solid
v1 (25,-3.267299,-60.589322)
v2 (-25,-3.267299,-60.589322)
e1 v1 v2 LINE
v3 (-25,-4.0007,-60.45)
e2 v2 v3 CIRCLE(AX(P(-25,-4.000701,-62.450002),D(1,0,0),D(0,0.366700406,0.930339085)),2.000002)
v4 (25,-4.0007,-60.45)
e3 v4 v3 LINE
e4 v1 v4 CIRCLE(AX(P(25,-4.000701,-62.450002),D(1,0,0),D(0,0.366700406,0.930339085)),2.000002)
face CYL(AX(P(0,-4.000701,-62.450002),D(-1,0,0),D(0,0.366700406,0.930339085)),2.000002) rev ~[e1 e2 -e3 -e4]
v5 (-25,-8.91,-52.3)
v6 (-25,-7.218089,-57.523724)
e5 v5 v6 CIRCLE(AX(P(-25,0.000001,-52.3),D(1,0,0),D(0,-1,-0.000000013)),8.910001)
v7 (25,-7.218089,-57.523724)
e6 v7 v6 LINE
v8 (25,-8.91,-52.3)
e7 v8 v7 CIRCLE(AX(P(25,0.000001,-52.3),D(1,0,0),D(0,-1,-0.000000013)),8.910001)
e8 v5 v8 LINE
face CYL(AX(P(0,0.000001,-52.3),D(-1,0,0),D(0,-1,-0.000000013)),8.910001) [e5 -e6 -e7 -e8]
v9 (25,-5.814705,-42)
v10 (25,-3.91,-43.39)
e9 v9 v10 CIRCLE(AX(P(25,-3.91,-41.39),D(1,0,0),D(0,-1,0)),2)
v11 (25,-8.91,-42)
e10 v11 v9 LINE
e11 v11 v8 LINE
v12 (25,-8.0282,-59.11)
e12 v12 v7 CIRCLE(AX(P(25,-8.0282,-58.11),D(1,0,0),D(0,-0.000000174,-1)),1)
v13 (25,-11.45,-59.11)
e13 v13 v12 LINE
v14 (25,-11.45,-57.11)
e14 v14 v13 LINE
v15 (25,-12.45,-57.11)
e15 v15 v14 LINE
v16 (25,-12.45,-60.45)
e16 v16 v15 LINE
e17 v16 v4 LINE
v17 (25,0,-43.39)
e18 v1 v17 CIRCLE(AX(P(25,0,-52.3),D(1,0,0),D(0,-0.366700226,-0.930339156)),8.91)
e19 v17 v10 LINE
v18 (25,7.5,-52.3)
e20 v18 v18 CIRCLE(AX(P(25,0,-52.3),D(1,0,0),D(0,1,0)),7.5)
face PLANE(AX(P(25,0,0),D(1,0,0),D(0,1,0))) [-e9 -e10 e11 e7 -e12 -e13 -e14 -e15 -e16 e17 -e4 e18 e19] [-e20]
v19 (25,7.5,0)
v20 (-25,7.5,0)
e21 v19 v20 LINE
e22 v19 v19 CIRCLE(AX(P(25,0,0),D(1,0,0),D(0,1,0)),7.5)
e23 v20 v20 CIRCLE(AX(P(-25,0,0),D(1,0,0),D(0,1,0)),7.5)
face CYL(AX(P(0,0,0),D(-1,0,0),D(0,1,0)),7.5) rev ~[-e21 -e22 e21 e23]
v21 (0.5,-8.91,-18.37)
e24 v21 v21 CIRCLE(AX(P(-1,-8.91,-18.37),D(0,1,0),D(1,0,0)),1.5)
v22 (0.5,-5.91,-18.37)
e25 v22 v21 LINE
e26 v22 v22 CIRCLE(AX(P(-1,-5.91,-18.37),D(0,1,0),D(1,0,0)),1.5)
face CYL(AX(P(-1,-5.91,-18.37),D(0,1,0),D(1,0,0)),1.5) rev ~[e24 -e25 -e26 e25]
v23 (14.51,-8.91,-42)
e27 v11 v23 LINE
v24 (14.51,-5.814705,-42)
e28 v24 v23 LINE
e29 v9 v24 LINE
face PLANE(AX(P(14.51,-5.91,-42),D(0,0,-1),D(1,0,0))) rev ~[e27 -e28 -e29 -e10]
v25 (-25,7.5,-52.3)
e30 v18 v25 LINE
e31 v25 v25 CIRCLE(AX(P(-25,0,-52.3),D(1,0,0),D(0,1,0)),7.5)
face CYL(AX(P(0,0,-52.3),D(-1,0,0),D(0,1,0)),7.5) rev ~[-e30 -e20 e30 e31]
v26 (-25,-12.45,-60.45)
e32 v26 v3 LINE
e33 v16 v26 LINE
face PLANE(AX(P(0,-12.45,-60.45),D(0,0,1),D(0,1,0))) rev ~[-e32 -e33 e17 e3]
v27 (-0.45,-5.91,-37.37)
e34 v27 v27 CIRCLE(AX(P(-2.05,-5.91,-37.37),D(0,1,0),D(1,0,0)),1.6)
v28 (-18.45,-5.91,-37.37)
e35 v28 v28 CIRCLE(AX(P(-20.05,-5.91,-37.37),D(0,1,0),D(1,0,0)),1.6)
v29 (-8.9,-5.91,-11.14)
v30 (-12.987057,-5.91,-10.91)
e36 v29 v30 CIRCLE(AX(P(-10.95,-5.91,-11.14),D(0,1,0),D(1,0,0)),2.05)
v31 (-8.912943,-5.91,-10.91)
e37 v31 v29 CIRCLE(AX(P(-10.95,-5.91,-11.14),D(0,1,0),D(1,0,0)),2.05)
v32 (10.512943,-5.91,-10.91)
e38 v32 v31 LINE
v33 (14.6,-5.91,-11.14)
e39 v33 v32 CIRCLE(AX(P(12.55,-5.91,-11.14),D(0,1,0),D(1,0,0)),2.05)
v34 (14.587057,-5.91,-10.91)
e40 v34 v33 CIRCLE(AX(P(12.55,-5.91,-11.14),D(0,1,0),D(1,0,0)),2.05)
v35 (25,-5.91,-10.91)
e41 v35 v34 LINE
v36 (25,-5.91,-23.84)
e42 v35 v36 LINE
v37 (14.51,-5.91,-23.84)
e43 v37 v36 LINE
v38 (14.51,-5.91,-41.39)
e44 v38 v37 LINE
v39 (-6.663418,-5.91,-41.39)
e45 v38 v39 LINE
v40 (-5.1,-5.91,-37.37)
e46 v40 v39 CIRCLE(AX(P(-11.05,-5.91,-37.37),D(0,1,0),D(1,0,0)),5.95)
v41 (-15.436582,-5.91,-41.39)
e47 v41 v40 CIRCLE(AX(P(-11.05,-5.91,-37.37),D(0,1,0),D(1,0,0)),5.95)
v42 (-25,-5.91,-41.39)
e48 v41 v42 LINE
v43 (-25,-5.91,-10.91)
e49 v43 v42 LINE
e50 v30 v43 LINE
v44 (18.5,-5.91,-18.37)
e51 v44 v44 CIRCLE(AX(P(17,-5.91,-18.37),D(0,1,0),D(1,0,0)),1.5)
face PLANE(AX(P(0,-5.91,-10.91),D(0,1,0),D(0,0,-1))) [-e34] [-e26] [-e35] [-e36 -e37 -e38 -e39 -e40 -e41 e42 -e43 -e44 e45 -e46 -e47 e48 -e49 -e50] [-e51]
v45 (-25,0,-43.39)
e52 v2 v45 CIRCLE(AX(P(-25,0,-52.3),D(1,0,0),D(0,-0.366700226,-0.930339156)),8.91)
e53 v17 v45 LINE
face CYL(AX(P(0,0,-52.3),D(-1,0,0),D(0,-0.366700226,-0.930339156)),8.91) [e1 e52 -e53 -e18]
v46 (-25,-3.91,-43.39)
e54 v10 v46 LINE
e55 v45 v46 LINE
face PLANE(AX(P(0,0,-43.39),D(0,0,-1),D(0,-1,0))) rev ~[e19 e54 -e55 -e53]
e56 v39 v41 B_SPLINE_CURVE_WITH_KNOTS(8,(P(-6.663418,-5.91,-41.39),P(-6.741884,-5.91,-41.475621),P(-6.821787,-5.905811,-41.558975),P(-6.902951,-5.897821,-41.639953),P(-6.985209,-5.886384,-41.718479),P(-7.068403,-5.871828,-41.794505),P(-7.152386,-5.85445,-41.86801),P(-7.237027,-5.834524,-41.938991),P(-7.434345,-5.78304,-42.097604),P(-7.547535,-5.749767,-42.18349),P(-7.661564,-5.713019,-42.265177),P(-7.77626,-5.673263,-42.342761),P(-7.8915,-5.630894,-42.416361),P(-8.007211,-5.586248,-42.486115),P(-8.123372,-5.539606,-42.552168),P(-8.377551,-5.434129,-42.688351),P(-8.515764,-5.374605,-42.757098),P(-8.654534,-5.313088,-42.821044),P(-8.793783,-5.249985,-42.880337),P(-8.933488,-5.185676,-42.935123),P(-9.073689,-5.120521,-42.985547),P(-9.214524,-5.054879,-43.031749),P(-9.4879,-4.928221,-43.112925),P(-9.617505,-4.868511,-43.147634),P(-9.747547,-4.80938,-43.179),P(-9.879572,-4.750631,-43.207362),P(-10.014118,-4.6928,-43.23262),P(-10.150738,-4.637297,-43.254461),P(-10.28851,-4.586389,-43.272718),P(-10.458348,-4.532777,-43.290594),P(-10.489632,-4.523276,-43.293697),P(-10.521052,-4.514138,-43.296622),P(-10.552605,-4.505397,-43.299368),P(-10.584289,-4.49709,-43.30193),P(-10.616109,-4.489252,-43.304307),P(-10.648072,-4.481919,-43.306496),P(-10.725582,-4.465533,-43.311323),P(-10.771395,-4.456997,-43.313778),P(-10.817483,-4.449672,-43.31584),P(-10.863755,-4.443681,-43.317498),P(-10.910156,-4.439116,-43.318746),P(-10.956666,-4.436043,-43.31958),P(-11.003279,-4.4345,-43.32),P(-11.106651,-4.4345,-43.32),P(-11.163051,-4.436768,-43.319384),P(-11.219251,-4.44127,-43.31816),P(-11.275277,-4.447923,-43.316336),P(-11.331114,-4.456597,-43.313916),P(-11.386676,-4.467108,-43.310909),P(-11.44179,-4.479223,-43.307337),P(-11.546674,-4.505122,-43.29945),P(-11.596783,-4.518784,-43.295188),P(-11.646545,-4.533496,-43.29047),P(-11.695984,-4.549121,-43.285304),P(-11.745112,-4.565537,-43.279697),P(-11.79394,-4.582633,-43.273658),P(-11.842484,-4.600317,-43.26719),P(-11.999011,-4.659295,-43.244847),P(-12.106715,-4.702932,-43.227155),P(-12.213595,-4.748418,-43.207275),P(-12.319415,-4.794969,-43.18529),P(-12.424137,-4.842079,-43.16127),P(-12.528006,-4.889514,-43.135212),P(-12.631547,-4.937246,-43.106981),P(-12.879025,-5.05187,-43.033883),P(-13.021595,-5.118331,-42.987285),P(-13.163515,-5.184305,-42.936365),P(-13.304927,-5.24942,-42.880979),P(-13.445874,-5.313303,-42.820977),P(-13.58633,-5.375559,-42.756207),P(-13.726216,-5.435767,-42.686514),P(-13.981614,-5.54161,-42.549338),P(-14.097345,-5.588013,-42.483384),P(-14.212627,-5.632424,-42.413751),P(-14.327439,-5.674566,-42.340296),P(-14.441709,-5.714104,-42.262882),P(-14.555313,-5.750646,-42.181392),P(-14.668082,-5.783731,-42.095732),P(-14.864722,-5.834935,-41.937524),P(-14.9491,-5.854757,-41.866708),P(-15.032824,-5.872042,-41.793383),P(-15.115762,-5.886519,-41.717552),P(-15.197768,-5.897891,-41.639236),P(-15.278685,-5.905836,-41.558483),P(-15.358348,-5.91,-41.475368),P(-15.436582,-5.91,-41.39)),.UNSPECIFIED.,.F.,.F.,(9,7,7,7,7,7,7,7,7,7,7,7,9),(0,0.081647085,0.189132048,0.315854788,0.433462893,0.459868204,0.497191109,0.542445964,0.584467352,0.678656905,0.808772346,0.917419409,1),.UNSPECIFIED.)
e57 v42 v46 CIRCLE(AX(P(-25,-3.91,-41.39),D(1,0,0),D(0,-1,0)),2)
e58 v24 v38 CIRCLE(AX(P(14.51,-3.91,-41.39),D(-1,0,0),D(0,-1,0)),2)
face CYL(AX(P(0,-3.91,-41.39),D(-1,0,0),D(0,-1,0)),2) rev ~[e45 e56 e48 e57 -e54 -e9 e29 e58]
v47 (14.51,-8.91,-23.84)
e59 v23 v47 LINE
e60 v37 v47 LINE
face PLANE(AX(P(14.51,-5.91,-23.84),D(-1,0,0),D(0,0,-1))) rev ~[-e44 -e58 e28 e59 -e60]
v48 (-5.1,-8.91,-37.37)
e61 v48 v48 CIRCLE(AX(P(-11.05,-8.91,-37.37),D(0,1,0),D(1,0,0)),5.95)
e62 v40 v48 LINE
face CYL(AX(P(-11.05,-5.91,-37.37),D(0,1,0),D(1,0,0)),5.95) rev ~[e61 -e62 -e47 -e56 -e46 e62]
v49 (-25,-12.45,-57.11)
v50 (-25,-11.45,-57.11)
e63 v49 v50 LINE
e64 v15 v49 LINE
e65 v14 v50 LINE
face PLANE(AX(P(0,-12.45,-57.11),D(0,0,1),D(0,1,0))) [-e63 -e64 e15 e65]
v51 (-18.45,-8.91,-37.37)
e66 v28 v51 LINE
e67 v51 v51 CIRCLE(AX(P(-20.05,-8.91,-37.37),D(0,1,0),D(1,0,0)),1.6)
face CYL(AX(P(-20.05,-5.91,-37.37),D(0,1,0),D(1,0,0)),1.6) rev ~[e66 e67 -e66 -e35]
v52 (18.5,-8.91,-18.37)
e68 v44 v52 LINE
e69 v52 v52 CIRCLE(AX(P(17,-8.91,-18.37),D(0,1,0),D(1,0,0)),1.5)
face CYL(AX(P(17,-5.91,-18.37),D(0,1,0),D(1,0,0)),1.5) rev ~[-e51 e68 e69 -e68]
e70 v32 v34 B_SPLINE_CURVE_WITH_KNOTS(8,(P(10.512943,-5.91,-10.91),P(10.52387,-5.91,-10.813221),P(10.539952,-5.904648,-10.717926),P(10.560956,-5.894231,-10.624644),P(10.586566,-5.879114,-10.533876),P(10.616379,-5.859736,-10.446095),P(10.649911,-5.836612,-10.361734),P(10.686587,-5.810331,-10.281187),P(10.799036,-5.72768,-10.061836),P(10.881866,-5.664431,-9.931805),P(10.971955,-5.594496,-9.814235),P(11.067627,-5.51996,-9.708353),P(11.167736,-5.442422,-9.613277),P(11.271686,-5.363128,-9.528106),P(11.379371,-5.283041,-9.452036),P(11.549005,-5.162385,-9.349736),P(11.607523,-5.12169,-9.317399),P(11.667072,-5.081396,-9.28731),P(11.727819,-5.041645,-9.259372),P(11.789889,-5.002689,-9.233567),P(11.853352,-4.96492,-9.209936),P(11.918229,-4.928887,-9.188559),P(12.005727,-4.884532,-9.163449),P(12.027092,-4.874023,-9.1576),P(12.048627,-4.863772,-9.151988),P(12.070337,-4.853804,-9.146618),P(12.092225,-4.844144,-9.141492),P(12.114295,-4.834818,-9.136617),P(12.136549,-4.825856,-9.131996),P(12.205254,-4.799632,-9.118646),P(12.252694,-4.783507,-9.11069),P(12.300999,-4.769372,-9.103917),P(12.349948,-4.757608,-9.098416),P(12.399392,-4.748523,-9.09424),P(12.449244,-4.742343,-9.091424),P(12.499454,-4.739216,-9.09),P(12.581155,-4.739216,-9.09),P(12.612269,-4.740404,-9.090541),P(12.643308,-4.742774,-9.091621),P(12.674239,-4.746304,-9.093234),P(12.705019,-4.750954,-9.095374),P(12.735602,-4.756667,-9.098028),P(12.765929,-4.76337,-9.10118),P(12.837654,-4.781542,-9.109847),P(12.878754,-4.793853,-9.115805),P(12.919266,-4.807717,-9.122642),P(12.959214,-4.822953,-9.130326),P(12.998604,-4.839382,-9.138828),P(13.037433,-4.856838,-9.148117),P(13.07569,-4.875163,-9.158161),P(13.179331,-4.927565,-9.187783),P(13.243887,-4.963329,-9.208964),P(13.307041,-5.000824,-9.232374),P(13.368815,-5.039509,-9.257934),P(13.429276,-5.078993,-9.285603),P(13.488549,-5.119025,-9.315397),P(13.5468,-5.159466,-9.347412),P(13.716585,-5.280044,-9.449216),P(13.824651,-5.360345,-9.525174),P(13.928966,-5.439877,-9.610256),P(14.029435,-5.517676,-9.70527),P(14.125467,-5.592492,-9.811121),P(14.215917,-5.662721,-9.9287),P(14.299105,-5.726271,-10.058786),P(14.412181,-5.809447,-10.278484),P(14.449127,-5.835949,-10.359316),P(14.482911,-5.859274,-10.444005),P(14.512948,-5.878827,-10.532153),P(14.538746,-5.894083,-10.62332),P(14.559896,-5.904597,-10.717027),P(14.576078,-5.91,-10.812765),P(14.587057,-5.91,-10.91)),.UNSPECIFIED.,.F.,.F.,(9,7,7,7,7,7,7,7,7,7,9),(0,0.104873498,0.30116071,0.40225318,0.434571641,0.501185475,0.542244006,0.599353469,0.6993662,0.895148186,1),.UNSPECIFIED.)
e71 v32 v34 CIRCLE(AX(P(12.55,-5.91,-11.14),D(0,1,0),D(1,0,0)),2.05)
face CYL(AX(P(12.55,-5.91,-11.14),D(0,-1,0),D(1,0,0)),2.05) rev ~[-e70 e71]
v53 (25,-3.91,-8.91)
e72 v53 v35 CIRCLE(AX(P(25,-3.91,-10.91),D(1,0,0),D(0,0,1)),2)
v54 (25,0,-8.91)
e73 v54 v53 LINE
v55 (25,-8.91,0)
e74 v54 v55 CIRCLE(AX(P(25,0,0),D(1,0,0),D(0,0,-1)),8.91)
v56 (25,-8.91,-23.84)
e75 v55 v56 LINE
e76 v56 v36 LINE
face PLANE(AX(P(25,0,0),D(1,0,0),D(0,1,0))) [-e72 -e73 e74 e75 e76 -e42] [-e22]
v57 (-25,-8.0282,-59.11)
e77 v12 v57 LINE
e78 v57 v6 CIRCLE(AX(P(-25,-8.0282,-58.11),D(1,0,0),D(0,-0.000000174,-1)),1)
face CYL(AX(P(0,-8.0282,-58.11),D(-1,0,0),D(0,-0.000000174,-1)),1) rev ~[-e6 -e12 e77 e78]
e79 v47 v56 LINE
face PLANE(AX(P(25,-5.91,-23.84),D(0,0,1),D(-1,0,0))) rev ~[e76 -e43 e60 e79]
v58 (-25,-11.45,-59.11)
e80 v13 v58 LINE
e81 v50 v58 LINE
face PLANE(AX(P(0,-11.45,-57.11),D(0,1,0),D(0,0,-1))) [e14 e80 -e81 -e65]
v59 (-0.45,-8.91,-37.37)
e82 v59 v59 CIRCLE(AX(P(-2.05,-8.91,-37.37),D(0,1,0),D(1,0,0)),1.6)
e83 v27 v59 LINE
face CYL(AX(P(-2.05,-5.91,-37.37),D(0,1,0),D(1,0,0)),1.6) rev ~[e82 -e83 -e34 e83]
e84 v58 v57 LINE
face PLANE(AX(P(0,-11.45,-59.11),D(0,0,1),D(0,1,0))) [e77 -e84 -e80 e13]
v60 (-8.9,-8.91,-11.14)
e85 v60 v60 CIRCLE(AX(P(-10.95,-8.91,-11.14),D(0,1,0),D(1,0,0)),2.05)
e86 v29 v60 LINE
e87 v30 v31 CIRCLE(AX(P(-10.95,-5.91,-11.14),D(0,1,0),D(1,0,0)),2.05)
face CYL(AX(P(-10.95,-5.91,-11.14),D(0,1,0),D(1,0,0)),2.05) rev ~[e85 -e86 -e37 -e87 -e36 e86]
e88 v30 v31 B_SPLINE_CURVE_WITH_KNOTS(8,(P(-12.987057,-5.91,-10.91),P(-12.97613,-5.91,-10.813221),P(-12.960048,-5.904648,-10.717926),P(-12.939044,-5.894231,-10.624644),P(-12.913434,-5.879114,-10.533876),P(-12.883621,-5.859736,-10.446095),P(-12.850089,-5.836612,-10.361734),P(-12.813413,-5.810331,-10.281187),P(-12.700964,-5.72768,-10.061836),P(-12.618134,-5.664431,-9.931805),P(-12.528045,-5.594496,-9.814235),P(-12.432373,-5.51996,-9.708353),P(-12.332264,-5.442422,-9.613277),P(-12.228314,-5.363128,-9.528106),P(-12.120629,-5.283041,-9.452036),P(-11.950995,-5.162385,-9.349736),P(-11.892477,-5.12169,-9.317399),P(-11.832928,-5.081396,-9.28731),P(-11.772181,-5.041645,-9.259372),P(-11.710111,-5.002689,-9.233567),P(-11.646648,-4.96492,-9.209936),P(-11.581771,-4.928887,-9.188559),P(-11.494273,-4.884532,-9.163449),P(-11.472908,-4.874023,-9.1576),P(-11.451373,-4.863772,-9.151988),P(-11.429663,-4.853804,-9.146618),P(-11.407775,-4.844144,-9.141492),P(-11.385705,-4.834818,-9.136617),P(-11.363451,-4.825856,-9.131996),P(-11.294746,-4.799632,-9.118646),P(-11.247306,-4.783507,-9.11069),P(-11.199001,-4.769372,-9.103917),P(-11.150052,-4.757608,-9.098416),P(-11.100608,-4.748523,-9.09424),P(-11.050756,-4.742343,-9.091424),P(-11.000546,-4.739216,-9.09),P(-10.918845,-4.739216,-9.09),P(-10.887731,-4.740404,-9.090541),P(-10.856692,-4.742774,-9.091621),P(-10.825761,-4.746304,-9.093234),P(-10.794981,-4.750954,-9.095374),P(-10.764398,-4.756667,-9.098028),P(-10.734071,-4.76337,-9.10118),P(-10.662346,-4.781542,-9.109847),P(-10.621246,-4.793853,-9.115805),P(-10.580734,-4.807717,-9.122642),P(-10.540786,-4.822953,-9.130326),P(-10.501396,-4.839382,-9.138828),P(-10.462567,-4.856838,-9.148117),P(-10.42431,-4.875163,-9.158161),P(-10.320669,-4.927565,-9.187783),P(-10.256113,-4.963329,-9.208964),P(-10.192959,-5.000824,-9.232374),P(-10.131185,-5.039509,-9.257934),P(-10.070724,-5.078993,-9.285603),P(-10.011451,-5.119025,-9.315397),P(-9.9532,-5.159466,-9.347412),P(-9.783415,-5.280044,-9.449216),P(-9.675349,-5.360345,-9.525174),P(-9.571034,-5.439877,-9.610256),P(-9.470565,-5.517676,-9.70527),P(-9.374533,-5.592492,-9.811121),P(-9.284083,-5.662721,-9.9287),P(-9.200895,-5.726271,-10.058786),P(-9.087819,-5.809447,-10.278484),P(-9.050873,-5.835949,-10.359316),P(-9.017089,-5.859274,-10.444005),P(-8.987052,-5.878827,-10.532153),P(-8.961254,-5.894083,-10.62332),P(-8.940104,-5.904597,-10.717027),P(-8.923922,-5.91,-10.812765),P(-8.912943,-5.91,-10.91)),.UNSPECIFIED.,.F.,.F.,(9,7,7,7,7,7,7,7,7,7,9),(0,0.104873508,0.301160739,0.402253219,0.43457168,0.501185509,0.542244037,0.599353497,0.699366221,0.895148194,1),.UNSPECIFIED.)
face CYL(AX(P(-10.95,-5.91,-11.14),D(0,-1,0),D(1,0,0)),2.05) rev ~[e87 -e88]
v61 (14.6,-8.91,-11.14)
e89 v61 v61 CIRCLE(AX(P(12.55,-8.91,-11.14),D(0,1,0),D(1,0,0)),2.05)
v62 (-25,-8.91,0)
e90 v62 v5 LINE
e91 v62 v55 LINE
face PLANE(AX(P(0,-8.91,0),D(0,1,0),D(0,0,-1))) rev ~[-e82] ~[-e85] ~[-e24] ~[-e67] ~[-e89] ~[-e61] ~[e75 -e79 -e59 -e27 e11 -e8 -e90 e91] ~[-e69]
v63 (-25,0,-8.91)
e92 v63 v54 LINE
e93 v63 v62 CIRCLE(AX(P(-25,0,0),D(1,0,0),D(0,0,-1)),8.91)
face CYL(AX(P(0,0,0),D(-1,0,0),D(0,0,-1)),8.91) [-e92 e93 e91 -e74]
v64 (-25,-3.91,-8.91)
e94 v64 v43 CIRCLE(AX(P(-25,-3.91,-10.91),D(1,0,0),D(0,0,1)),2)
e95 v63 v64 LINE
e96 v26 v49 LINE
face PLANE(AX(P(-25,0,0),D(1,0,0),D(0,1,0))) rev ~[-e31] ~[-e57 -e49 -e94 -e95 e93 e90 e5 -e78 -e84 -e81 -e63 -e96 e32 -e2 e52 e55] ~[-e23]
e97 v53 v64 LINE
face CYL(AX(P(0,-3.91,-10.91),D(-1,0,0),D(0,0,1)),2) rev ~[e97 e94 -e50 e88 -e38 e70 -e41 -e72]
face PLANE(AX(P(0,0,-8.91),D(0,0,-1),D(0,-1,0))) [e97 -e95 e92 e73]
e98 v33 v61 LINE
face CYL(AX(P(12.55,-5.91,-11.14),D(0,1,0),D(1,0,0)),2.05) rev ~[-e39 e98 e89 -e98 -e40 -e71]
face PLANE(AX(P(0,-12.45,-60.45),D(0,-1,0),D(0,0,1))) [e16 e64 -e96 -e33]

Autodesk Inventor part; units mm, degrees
ref_plane "YZ Plane" through (0, 0, 0) normal (1, 0, 0) x (0, 1, 0)
ref_plane "XZ Plane" through (0, 0, 0) normal (0, 1, 0) x (-1, 0, 0)
ref_plane "XY Plane" through (0, 0, 0) normal (0, 0, 1) x (1, 0, 0)
sketch "Эскиз1" plane through (0, 0, 0) normal (1, 0, 0) x (0, 1, 0)
  line L0 (0, 0) -> (143.27187, 0) construction
  line L1 (0, 0) -> (0, -170.504512) construction
  arc A0 (0, -8.91) -> (-8.91, 0) centre (0, 0) ccw
  circle A1 centre (0, -52.3) radius 7.5
  circle A2 centre (0, 0) radius 7.5
  line L2 (-8.91, 0) -> (-8.91, -52.3)
  line L3 (-5.91, -10.91) -> (-5.91, -41.39)
  line L4 (0, -8.91) -> (-3.91, -8.91)
  line L5 (0, -43.39) -> (-3.91, -43.39)
  line L6 (-12.45, -60.45) -> (-12.45, -57.11)
  line L7 (-12.45, -57.11) -> (-11.45, -57.11)
  line L8 (-11.45, -57.11) -> (-11.45, -59.11)
  line L9 (-11.45, -59.11) -> (-8.0282, -59.11)
  arc A3 (-8.91, -52.3) -> (-7.218089, -57.523724) centre (0, -52.3) ccw
  arc A4 (-3.267299, -60.589322) -> (0, -43.39) centre (0, -52.3) ccw
  circle A5 centre (0, 0) radius 4 construction
  line L10 (0, 4) -> (-17.853128, 4) construction
  line L11 (-17.853128, 4) -> (-17.853128, -60.45) construction
  line L12 (-17.853128, -60.45) -> (-12.45, -60.45) construction
  line L13 (-12.45, -60.45) -> (-4.0007, -60.45)
  arc A6 (-8.0282, -59.11) -> (-7.218089, -57.523724) centre (-8.0282, -58.11) ccw
  arc A7 (-5.91, -41.39) -> (-3.91, -43.39) centre (-3.91, -41.39) ccw
  arc A8 (-3.91, -8.91) -> (-5.91, -10.91) centre (-3.91, -10.91) ccw
  arc A9 (-3.267299, -60.589322) -> (-4.0007, -60.45) centre (-4.0007, -62.45) ccw
  point P0 (-5.91, -43.39)
  point P1 (-5.91, -8.91)
  point P2 (0, -61.21)
  point P3 (-5.745607, -59.11)
  point P4 (-3.600778, -60.45)
  dimension "d34" = 8
  dimension "d0" = 17.82
  dimension "d2" = 15
  dimension "d3" = 15
  dimension "d4" = 52.3
  dimension "d5" = 3
  dimension "d9" = 1
  dimension "d11" = 8.91
  dimension "d12" = 8.91
  dimension "d13" = 3.54
  dimension "d35" = 64.45
  dimension "d36" = 3.34
  dimension "d37" = 1.34
  dimension "d38" = 1
  dimension "d39" = 2
  dimension "d40" = 2
  dimension "d41" = 2
  dimension "d42" = 63.11
  dimension "d43" = 70.12
extrude "Выдавливание1" add sketch "Эскиз1" along normal mid plane 50
sketch "Эскиз2" plane through (-25, -5.91, -8.91) normal (0, 1, 0) x (1, 0, 0)
  circle A0 centre (13.95, 28.46) radius 5.95
  line L0 (4.95, 28.46) -> (13.95, 28.46) construction
  line L1 (13.95, 28.46) -> (24.436318, 28.46) construction
  circle A1 centre (4.95, 28.46) radius 1.6
  circle A2 centre (22.95, 28.46) radius 1.6
  line L2 (13.95, 28.46) -> (13.95, 32.27883)
  circle A3 centre (4.95, 28.46) radius 1.455 construction
  circle A4 centre (22.95, 28.46) radius 1.455 construction
  line L3 (0, 5.642815) -> (0, 38.122815) construction
  line L4 (50, -8.91) -> (50, 43.39) construction
  line L5 (50, 14.93) -> (39.51, 14.93)
  line L6 (39.51, 14.93) -> (39.51, 33.09)
  line L7 (39.51, 33.09) -> (50, 33.09)
  line L8 (50, 33.09) -> (50, 14.93)
  line L9 (0, -18.82) -> (50, -18.82) construction
  line L10 (50, 43.39) -> (2.383382, 43.39)
  line L11 (50, -17.82) -> (50, 0)
  line L12 (50, -17.82) -> (50, 0)
  line L13 (50, -8.91) -> (53.294914, -8.91)
  line L14 (50, -12.91) -> (54.162489, -12.91)
  line L15 (0, 52.3) -> (50, 52.3)
  dimension "d15" = 3.2
  dimension "d16" = 3.2
  dimension "d17" = 2.91
  dimension "d18" = 2.91
  dimension "d21" = 18
  dimension "d22" = 11.9
  dimension "d23" = 8
  dimension "d25" = 39.51
  dimension "d27" = 18.16
  dimension "d44" = 17.82
  dimension "d45" = 8.91
  dimension "d46" = 8.91
  dimension "d48" = 4
  dimension "d49" = 46
  dimension "d50" = 10.49
  dimension "d51" = 19.61
  dimension "d52" = 17.89
extrude "Выдавливание2" cut sketch "Эскиз2" along normal mid plane 50
sketch "Эскиз4" plane through (-25, -5.91, -10.91) normal (0, 1, 0) x (1, 0, 0)
  line L0 (14.05, 0.23) -> (37.55, 0.23) construction
  circle A0 centre (14.05, 0.23) radius 2.05
  circle A1 centre (37.55, 0.23) radius 2.05
  line L1 (0, -19.82) -> (50, -19.82) construction
  line L2 (0, 0) -> (0, 30.48) construction
  line L3 (50, 12.93) -> (50, 0) projected
  point P0 (25, -10.91)
  dimension "d53" = 4.1
  dimension "d54" = 4.1
  dimension "d57" = 18
  dimension "d61" = 19.4
  dimension "d63" = 14.05
  dimension "d65" = 23.5
extrude "Выдавливание3" cut sketch "Эскиз4" along normal mid plane 50
sketch "Эскиз6" plane through (-25, -5.91, -10.91) normal (0, 1, 0) x (1, 0, 0)
  circle A0 centre (42, 7.46) radius 1.5
  arc A1 (16.087057, 0) -> (12.012943, 0) centre (14.05, 0.23) ccw
  circle A2 centre (14.05, 0.23) radius 2
  arc A3 (39.587057, 0) -> (35.512943, 0) centre (37.55, 0.23) ccw
  circle A4 centre (37.55, 0.23) radius 2
  circle A5 centre (24, 7.46) radius 1.5
  circle A6 centre (4.95, 26.46) radius 1.129269
  spline S0 degree 3 poles (21.799899, 26.563204) (21.753431, 26.045363) (22.103055, 25.518519) (22.59827, 25.36015) (23.093485, 25.201782) (23.683934, 25.427991) (23.946568, 25.876703) (24.209201, 26.325414) (24.117313, 26.951) (23.73674, 27.305235) (23.356167, 27.659471) (22.725608, 27.706335) (22.296851, 27.41225) (21.868094, 27.118165) (21.684738, 26.513036) (21.878155, 26.03043) (22.071571, 25.547824) (22.622094, 25.236816) (23.135279, 25.320239) (23.648464, 25.403662) (24.072128, 25.873034) (24.102721, 26.392055) (24.133314, 26.911075) (23.767725, 27.426968) (23.267894, 27.570102) (22.768063, 27.713236) (22.184816, 27.469056) (21.936042, 27.012515) (21.687268, 26.555973) (21.798265, 25.933494) (22.189505, 25.591075) (22.580744, 25.248657) (23.212442, 25.221119) (23.631995, 25.528192) (24.051548, 25.835265) (24.216293, 26.445724) (24.008192, 26.922183) (23.800091, 27.398641) (23.240306, 27.692649) (22.729915, 27.593554) (22.219524, 27.494459) (21.810428, 27.012338) (21.795739, 26.492624) (21.78105, 25.972909) (22.162261, 25.468451) (22.66624, 25.340686) (23.170219, 25.212921) (23.745717, 25.474842) (23.980398, 25.938786) (24.215078, 26.40273) (24.085076, 27.021519) (23.683537, 27.3518) (23.281998, 27.68208) (22.649753, 27.690266) (22.239798, 27.370492) (21.829842, 27.050718) (21.683864, 26.435502) (21.906453, 25.965638) (22.129043, 25.495774) (22.697567, 25.219041) (23.204685, 25.333715) (23.711803, 25.448389) (24.105947, 25.942808) (24.104719, 26.462729) (24.10349, 26.982649) (23.707014, 27.475201) (23.199359, 27.587476) (22.691705, 27.699752) (22.124496, 27.420335) (21.904129, 26.949424) (21.683762, 26.478514) (21.832647, 25.863994) (22.244109, 25.546162) (22.655571, 25.228329) (23.28777, 25.239503) (23.687744, 25.571677) (24.087717, 25.903851) (24.214793, 26.523248) (23.977923, 26.986078) (23.741053, 27.448907) (23.164323, 27.708105) (22.660954, 27.57796) (22.157584, 27.447815) (21.778761, 26.94156) (21.795906, 26.421922) (21.813051, 25.902283) (22.224421, 25.4221) (22.735274, 25.325418) (23.246128, 25.228736) (23.804518, 25.525387) (24.010365, 26.002824) (24.216211, 26.48026) (24.048583, 27.089934) (23.627584, 27.39502) (23.206584, 27.700107) (22.575023, 27.669584) (22.185407, 27.325321) (21.79579, 26.981057) (21.687736, 26.35806) (21.938665, 25.9027) (22.189593, 25.447339) (22.773988, 25.205918) (23.273137, 25.351413) (23.772286, 25.496907) (24.135433, 26.014522) (24.102387, 26.533393) (24.069342, 27.052263) (23.643464, 27.519627) (23.12989, 27.600624) (22.616316, 27.681621) (22.06727, 27.368014) (21.876136, 26.8845) (21.685002, 26.400985) (21.871217, 25.796729) (22.301359, 25.504674) (22.731501, 25.212619) (23.361832, 25.262462) (23.740726, 25.618492) (24.119621, 25.974522) (24.208551, 26.600535) (23.9438, 27.048001) (23.679048, 27.495466) (23.087537, 27.718883) (22.593076, 27.558175) (22.098615, 27.397467) (21.751485, 26.868978) (21.8004, 26.351362) (21.849315, 25.833747) (22.289301, 25.37964) (22.805114, 25.314404) (23.320926, 25.249168) (23.860114, 25.579436) (24.036356, 26.068575) (24.212598, 26.557715) (24.007972, 27.155986) (23.56909, 27.434736) (23.130209, 27.713486) (22.5017, 27.644368) (22.133882, 27.276906) (21.961347, 27.104537) (21.845629, 26.876206) (21.808638, 26.635144) knots 2.61665571 2.61665571 2.61665571 2.61665571 3.96742673 3.96742673 3.96742673 5.31819776 5.31819776 5.31819776 6.66896878 6.66896878 6.66896878 8.01973981 8.01973981 8.01973981 9.37051084 9.37051084 9.37051084 10.72128186 10.72128186 10.72128186 12.07205289 12.07205289 12.07205289 13.42282392 13.42282392 13.42282392 14.77359494 14.77359494 14.77359494 16.12436597 16.12436597 16.12436597 17.475137 17.475137 17.475137 18.82590802 18.82590802 18.82590802 20.17667905 20.17667905 20.17667905 21.52745007 21.52745007 21.52745007 22.8782211 22.8782211 22.8782211 24.22899213 24.22899213 24.22899213 25.57976315 25.57976315 25.57976315 26.93053418 26.93053418 26.93053418 28.28130521 28.28130521 28.28130521 29.63207623 29.63207623 29.63207623 30.98284726 30.98284726 30.98284726 32.33361829 32.33361829 32.33361829 33.68438931 33.68438931 33.68438931 35.03516034 35.03516034 35.03516034 36.38593137 36.38593137 36.38593137 37.73670239 37.73670239 37.73670239 39.08747342 39.08747342 39.08747342 40.43824444 40.43824444 40.43824444 41.78901547 41.78901547 41.78901547 43.1397865 43.1397865 43.1397865 44.49055752 44.49055752 44.49055752 45.84132855 45.84132855 45.84132855 47.19209958 47.19209958 47.19209958 48.5428706 48.5428706 48.5428706 49.89364163 49.89364163 49.89364163 51.24441266 51.24441266 51.24441266 52.59518368 52.59518368 52.59518368 53.94595471 53.94595471 53.94595471 55.29672574 55.29672574 55.29672574 56.64749676 56.64749676 56.64749676 57.99826779 57.99826779 57.99826779 59.34903881 59.34903881 59.34903881 60.69980984 60.69980984 60.69980984 62.05058087 62.05058087 62.05058087 63.40135189 63.40135189 63.40135189 64.75212292 64.75212292 64.75212292 65.38573969 65.38573969 65.38573969 65.38573969
  circle A7 centre (22.95, 26.46) radius 1.6
  circle A8 centre (22.95, 26.46) radius 1.154622
  circle A9 centre (4.95, 26.46) radius 2.474109
  line L0 (-39.849119, 12.49) -> (304.043155, 12.49)
  line L1 (39.51, 31.09) -> (50, 31.09)
  line L2 (39.51, 12.93) -> (39.51, 30.48)
  line L3 (50, 12.93) -> (50, 0)
  point P0 (25, -10.91)
  dimension "d66" = 3
  dimension "d67" = 4
  dimension "d68" = 4
  dimension "d70" = 3
  dimension "d72" = 19
  dimension "d73" = 19
  dimension "d74" = 12.26
  dimension "d75" = 30.86
  dimension "d76" = 23.63
  dimension "d78" = 8
  dimension "d79" = 18
extrude "Выдавливание4" cut sketch "Эскиз6" against normal blind 10 contours A0 | A5
properties part number "каретка  хотэнда"
